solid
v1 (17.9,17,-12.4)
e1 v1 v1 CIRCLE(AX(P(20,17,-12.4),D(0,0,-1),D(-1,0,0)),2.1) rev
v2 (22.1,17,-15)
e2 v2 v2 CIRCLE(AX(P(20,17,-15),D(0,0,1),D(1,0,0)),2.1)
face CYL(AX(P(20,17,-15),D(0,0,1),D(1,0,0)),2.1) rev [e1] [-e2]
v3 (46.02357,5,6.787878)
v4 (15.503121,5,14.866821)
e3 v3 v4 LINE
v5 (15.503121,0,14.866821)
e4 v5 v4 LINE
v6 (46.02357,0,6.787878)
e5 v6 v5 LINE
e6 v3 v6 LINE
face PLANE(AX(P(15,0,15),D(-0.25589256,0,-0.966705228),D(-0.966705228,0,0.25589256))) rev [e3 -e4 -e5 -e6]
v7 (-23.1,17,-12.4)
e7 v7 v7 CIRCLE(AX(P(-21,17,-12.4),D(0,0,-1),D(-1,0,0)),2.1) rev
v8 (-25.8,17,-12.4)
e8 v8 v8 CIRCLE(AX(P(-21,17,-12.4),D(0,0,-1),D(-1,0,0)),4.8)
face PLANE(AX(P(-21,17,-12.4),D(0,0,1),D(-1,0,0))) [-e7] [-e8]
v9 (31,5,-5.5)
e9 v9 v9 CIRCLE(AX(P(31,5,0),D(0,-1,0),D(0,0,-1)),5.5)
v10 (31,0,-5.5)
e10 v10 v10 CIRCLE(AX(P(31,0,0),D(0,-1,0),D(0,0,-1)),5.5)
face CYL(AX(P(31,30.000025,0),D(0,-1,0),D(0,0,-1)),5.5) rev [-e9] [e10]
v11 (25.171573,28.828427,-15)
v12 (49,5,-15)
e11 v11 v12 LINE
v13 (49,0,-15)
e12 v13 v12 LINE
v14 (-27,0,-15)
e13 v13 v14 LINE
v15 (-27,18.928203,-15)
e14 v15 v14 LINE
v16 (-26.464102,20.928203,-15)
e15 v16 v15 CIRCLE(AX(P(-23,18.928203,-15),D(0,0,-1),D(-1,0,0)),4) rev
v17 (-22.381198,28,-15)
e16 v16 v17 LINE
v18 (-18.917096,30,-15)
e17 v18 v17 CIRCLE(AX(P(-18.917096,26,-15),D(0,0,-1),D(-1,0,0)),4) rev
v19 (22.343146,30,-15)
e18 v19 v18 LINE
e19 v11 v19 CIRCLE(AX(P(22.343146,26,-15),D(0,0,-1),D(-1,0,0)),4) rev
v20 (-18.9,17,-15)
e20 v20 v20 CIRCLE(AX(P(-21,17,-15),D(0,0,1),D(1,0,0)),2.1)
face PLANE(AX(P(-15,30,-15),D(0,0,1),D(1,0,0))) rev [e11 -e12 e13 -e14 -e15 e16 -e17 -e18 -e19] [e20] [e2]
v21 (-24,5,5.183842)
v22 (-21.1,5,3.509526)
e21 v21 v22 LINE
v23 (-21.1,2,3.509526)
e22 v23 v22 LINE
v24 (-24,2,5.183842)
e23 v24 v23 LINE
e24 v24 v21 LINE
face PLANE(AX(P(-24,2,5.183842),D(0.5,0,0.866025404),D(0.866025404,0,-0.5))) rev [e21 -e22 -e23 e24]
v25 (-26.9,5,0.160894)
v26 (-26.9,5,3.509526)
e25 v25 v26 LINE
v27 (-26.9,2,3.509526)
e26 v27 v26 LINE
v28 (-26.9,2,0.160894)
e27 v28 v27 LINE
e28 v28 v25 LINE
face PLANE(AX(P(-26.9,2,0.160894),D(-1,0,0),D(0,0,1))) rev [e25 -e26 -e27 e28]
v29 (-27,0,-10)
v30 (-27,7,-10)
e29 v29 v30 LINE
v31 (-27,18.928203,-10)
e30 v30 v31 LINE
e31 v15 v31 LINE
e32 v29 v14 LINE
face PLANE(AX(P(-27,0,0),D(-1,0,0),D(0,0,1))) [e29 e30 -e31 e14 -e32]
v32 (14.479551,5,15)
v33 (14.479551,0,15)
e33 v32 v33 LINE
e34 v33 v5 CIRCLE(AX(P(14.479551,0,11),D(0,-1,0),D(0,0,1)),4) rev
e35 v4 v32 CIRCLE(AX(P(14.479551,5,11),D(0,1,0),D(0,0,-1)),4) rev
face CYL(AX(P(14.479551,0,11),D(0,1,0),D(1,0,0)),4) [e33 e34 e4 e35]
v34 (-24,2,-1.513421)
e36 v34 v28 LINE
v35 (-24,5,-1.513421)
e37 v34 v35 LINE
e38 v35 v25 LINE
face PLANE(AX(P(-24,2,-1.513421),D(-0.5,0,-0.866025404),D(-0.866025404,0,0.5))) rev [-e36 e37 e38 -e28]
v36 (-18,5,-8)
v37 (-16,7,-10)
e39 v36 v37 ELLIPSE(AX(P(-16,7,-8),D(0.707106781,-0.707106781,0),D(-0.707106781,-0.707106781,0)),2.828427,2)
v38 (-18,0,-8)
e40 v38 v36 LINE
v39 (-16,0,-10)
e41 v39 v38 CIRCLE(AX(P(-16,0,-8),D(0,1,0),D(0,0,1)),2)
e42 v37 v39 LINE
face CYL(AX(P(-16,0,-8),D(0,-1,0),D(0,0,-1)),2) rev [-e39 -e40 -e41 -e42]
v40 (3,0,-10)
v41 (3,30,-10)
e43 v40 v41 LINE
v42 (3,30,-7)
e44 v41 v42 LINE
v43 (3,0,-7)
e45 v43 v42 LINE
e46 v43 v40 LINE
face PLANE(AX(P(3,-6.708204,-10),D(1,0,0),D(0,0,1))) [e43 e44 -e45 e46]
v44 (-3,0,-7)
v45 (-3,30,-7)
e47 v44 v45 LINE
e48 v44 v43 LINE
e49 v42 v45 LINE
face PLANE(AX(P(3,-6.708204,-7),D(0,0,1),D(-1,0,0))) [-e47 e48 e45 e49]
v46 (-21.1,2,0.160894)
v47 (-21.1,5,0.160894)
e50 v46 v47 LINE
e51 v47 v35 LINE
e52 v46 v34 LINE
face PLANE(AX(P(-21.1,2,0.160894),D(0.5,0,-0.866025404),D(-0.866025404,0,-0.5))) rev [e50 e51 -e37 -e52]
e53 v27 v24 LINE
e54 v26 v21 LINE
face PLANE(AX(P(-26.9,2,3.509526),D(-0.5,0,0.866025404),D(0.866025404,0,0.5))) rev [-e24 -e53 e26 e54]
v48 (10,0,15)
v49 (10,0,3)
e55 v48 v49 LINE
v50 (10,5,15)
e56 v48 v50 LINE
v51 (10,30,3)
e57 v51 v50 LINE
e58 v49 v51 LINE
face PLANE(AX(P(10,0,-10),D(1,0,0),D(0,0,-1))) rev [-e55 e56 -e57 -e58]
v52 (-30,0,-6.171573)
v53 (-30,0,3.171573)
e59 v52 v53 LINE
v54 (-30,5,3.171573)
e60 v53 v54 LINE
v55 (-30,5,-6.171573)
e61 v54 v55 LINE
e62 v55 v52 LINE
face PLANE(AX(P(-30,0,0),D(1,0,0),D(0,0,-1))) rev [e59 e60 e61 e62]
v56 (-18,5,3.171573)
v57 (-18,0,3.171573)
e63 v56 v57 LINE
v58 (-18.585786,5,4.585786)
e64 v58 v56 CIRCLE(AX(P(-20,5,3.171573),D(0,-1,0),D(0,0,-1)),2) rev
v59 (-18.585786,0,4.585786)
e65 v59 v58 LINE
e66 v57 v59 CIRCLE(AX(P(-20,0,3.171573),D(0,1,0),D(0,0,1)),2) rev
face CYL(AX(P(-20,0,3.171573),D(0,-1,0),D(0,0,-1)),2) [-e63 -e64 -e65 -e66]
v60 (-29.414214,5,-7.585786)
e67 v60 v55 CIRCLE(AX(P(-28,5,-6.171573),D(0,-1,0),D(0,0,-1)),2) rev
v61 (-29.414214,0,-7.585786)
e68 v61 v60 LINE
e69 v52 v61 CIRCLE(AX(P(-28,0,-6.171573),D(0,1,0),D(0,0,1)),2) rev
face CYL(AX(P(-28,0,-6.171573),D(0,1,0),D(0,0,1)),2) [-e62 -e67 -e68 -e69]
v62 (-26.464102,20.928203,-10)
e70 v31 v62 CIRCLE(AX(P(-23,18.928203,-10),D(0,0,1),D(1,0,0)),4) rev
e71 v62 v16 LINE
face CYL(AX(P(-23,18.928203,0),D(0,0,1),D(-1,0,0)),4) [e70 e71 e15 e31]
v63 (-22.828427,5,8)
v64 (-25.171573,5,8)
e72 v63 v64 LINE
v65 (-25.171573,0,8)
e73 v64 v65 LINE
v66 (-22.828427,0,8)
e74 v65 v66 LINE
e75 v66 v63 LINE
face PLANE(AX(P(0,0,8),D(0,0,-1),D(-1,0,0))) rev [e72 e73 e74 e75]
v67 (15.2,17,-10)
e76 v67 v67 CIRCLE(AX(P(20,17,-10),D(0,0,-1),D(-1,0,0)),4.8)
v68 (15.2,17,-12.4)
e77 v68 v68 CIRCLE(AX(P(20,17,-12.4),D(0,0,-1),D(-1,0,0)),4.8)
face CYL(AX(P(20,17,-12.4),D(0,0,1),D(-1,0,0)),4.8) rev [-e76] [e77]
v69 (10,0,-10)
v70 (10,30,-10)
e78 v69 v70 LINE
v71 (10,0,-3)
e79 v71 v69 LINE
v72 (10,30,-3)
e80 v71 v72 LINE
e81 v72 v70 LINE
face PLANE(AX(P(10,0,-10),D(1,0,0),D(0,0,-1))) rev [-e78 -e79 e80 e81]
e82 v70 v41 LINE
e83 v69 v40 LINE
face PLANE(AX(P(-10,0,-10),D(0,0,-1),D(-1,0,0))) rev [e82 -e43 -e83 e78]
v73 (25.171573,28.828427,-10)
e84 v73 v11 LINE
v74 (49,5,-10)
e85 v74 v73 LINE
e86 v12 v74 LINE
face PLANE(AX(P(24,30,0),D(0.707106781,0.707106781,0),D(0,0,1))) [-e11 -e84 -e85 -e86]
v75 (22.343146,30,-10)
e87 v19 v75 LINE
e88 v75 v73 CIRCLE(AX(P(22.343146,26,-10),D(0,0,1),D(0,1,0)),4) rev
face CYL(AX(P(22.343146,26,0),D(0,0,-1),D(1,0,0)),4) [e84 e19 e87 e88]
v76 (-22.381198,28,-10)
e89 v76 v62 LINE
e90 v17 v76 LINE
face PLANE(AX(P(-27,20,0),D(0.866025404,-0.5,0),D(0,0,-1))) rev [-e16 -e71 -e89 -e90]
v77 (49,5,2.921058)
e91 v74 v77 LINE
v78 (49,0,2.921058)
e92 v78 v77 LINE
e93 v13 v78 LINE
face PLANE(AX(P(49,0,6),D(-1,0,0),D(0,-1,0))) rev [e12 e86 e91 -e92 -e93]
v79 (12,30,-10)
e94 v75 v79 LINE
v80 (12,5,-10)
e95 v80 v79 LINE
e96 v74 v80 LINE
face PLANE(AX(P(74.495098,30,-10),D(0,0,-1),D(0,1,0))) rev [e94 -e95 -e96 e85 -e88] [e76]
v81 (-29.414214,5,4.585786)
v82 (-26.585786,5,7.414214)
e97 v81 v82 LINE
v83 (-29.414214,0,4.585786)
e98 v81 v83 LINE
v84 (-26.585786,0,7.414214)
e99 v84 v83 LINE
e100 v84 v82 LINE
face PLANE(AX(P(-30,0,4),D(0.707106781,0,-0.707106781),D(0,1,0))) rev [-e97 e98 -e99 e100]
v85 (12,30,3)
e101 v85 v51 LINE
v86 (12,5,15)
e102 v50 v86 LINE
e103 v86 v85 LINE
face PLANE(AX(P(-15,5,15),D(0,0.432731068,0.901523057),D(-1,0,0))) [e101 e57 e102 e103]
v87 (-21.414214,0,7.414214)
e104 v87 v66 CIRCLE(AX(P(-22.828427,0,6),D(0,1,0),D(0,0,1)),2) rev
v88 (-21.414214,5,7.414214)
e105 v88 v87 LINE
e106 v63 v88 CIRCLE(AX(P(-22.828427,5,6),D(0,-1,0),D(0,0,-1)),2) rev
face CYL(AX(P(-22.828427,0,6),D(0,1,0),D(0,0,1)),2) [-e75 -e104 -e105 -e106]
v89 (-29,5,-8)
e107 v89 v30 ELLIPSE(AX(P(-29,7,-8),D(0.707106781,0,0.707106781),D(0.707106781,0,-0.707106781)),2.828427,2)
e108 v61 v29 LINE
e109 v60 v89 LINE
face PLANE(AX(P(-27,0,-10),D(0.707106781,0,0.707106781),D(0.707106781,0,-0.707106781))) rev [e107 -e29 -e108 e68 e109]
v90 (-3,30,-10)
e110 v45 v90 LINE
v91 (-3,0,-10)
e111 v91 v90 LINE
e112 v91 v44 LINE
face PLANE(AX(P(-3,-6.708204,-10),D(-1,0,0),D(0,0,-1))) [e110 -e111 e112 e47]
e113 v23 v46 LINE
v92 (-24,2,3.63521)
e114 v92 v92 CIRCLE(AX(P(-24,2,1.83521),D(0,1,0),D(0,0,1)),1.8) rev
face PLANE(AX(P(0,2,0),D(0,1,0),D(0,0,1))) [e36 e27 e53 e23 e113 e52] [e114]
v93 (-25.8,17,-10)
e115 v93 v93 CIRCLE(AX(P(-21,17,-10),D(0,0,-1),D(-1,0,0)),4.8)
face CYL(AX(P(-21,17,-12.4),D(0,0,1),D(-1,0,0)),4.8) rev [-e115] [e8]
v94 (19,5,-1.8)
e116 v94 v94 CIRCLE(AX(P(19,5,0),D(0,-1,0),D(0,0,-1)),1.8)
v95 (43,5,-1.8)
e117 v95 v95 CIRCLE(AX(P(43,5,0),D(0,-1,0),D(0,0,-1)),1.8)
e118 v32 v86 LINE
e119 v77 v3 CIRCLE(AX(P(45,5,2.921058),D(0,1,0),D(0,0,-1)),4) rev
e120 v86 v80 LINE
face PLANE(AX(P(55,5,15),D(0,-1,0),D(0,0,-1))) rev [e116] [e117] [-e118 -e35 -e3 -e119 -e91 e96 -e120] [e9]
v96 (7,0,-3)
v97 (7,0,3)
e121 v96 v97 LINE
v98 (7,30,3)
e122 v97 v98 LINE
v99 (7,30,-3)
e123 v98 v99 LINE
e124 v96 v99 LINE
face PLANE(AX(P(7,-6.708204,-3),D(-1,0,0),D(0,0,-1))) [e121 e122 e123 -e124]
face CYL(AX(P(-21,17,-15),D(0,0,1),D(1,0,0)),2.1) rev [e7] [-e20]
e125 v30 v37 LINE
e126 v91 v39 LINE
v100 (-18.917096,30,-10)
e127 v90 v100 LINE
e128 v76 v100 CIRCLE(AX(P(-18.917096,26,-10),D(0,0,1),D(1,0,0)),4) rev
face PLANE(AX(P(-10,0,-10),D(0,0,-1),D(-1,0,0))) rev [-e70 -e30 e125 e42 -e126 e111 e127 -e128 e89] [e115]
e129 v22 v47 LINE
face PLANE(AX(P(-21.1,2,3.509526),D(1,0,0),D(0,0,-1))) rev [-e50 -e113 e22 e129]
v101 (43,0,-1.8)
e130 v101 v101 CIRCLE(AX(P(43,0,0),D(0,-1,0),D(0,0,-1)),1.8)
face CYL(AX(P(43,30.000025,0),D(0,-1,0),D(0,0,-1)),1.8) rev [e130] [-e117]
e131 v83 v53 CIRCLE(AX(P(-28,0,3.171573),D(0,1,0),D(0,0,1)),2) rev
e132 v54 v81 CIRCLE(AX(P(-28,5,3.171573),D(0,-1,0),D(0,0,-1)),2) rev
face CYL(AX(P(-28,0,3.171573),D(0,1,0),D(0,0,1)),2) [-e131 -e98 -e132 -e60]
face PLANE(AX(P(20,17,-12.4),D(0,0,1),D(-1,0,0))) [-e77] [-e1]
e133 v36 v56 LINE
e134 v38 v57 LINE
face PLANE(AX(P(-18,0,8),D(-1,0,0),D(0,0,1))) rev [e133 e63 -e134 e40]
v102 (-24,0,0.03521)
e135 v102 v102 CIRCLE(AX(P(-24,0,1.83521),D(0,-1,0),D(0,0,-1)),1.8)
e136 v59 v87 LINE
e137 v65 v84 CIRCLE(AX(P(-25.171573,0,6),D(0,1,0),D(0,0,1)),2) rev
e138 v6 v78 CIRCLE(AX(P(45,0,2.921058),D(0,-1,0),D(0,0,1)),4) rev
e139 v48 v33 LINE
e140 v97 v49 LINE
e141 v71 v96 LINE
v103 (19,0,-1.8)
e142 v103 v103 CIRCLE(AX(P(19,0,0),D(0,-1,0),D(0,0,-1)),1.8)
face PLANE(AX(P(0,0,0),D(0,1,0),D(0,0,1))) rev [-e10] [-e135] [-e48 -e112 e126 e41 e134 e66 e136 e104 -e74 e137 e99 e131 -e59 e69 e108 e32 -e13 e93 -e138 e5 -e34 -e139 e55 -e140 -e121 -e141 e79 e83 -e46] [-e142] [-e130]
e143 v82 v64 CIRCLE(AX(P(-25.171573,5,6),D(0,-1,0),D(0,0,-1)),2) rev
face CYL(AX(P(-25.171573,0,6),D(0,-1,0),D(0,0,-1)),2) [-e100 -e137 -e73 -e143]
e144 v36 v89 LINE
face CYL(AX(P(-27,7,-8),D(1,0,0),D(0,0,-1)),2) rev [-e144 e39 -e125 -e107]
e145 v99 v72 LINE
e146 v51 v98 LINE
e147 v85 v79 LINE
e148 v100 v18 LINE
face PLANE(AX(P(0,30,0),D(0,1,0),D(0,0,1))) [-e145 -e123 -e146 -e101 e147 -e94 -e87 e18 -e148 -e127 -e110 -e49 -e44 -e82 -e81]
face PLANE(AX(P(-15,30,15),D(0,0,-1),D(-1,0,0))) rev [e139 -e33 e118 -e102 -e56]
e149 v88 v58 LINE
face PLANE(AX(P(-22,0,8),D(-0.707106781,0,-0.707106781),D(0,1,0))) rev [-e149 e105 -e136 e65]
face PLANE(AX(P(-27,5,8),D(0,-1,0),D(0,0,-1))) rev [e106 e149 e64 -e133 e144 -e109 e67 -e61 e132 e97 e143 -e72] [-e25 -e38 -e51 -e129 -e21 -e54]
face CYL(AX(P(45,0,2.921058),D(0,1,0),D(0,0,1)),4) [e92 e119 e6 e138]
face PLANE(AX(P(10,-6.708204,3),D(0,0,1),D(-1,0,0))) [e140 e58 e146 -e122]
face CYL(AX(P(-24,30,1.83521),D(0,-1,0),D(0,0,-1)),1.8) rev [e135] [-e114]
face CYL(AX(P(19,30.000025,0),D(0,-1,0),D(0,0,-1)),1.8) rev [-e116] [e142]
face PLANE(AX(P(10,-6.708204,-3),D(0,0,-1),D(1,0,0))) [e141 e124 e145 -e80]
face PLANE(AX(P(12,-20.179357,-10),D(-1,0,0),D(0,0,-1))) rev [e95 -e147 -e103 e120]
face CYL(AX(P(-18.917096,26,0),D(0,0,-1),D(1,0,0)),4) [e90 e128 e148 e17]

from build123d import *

# Parameters (mm, degrees)
SKETCH1_W                     = 30
SKETCH1_H                     = 30
BOSS_EXTRUDE1_DEPTH           = 30
SKETCH2_W                     = 20
SKETCH2_H                     = 20
CUT_EXTRUDE1_DEPTH            = 37.742346142
SKETCH3_W                     = 30
SKETCH3_H                     = 5
BOSS_EXTRUDE2_DEPTH           = 40
SKETCH4_R                     = 5.5
SKETCH4_R_2                   = 1.8
CUT_EXTRUDE2_DEPTH            = 65.420493634
CUT_EXTRUDE3_DEPTH            = 63.24949799
SKETCH5_W                     = 5
SKETCH5_H                     = 25
BOSS_EXTRUDE4_DEPTH           = 34
CHAMFER1_SIZE                 = 25
SKETCH8_R                     = 2.1
CUT_EXTRUDE4_DEPTH            = 63.657800791
SKETCH9_W                     = 5
SKETCH9_H                     = 30
BOSS_EXTRUDE5_DEPTH           = 12
CHAMFER2_SIZE                 = 10
CHAMFER2_SIZE2                = 5.773502692
SKETCH10_R                    = 2.1
CUT_EXTRUDE5_DEPTH            = 63.657800791
BODY_MOVE_COPY1_OUTLINE_R     = 1.8
BODY_MOVE_COPY1_OUTLINE_R_2   = 5.5
BODY_MOVE_COPY1_DEPTH         = 27.5685
BODY_MOVE_COPY1_2_OUTLINE_R   = 1.8
BODY_MOVE_COPY1_2_OUTLINE_R_2 = 5.5
BODY_MOVE_COPY1_2_DEPTH       = 5
BODY_MOVE_COPY1_START         = -15
BODY_MOVE_COPY1_3_DEPTH       = 5
BODY_MOVE_COPY1_4_DEPTH       = 5
SKETCH11_W                    = 3
SKETCH11_H                    = 25
CUT_EXTRUDE6_DEPTH            = 25
SKETCH12_W                    = 25
SKETCH12_H                    = 25
CUT_EXTRUDE7_DEPTH            = 60.380131357
SKETCH13_W                    = 3
SKETCH13_H                    = 6
SKETCH13_W_2                  = 6
SKETCH13_H_2                  = 3
BOSS_EXTRUDE6_DEPTH           = 30
SKETCH14_R                    = 4.8
CUT_EXTRUDE9_DEPTH            = 2.4
CHAMFER3_SIZE                 = 12
CHAMFER3_SIZE2                = 25
FILLET1_R                     = 4
FILLET2_R                     = 4
BODY_MOVE_COPY2_OUTLINE_R     = 1.8
BODY_MOVE_COPY2_OUTLINE_R_2   = 5.5
BODY_MOVE_COPY2_DEPTH         = 30
BODY_MOVE_COPY2_2_OUTLINE_R   = 1.8
BODY_MOVE_COPY2_2_OUTLINE_R_2 = 5.5
BODY_MOVE_COPY2_2_DEPTH       = 5
BODY_MOVE_COPY2_START         = -15
BODY_MOVE_COPY2_3_DEPTH       = 5
BODY_MOVE_COPY2_START_2       = -3
BODY_MOVE_COPY2_4_OUTLINE_W   = 5
BODY_MOVE_COPY2_4_OUTLINE_H   = 25
BODY_MOVE_COPY2_4_DEPTH       = 6
BODY_MOVE_COPY2_START_3       = -10
BODY_MOVE_COPY2_5_OUTLINE_W   = 2
BODY_MOVE_COPY2_5_OUTLINE_H   = 25
BODY_MOVE_COPY2_5_DEPTH       = 13
BODY_MOVE_COPY2_6_DEPTH       = 2.6
BODY_MOVE_COPY2_START_4       = 10
BODY_MOVE_COPY2_7_DEPTH       = 2
BODY_MOVE_COPY2_START_5       = 7
BODY_MOVE_COPY2_8_OUTLINE_W   = 25
BODY_MOVE_COPY2_8_OUTLINE_H   = 6
BODY_MOVE_COPY2_8_DEPTH       = 3.26576
BODY_MOVE_COPY2_START_6       = -16
BODY_MOVE_COPY2_9_DEPTH       = 6
BODY_MOVE_COPY2_START_7       = -12.4
BODY_MOVE_COPY2_10_DEPTH      = 2.4
SKETCH15_W                    = 13
SKETCH15_H                    = 5
BOSS_EXTRUDE7_DEPTH           = 18
SKETCH17_W                    = 23
SKETCH17_H                    = 5
BOSS_EXTRUDE8_DEPTH           = 3
SKETCH18_W                    = 4
SKETCH18_H                    = 18
CUT_EXTRUDE10_DEPTH           = 58.017541161
CHAMFER6_SIZE                 = 4
FILLET4_R                     = 2
SKETCH16_R                    = 1.8
CUT_EXTRUDE11_DEPTH           = 60.380131357
CUT_EXTRUDE12_DEPTH           = 3


with BuildPart() as part:
    # Sketch1 → Boss-Extrude1 (new body)
    with BuildSketch(Plane(origin=(0, 0, 0), x_dir=(1, 0, 0), z_dir=(0, 1, 0))):
        Rectangle(SKETCH1_W, SKETCH1_H)
    extrude(amount=BOSS_EXTRUDE1_DEPTH)

    # Sketch2 → Cut-Extrude1 (cut, through all)
    with BuildSketch(Plane(origin=(0, 30, 0), x_dir=(1, 0, 0), z_dir=(0, 1, 0))):
        Rectangle(SKETCH2_W, SKETCH2_H)
    extrude(amount=-CUT_EXTRUDE1_DEPTH, mode=Mode.SUBTRACT)

    # Sketch3 → Boss-Extrude2 (add)
    with BuildSketch(Plane(origin=(15, 0, 0), x_dir=(0, 0, -1), z_dir=(1, 0, 0))):
        with Locations((0, 2.5)):
            Rectangle(SKETCH3_W, SKETCH3_H)
    extrude(amount=BOSS_EXTRUDE2_DEPTH)

    # Sketch4 → Cut-Extrude2 (cut, through all)
    with BuildSketch(Plane.XZ):
        with Locations(Location((31, 0, 0), (0, 0, 270))):
            Circle(SKETCH4_R)
        with Locations(Location((19, 0, 0), (0, 0, 270))):
            Circle(SKETCH4_R_2)
        with Locations(Location((43, 0, 0), (0, 0, 270))):
            Circle(SKETCH4_R_2)
    extrude(amount=-CUT_EXTRUDE2_DEPTH, mode=Mode.SUBTRACT)

    # Sketch7 → Cut-Extrude3 (cut, through all)
    with BuildSketch(Plane(origin=(0, 5, 0), x_dir=(1, 0, 0), z_dir=(0, 1, 0))):
        Polygon((15, -15), (49, -6), (49, 15), (55, 15), (55, -15), align=None)
    extrude(amount=-CUT_EXTRUDE3_DEPTH, mode=Mode.SUBTRACT)

    # Sketch5 → Boss-Extrude4 (add)
    with BuildSketch(Plane(origin=(15, 0, 0), x_dir=(0, 0, -1), z_dir=(1, 0, 0))):
        with Locations((12.5, 17.5)):
            Rectangle(SKETCH5_W, SKETCH5_H)
    extrude(amount=BOSS_EXTRUDE4_DEPTH)

    # Chamfer1
    chamfer1_edges = [part.edges().sort_by_distance(p)[0] for p in [
        (49, 30, -12.5),
    ]]
    chamfer(chamfer1_edges, length=CHAMFER1_SIZE)

    # Sketch8 → Cut-Extrude4 (cut, through all)
    with BuildSketch(Plane.XY.offset(-10)):
        with Locations((20, 17)):
            Circle(SKETCH8_R)
    extrude(amount=-CUT_EXTRUDE4_DEPTH, mode=Mode.SUBTRACT)

    # Sketch9 → Boss-Extrude5 (add)
    with BuildSketch(Plane.ZY.offset(15)):
        with Locations((-12.5, 15)):
            Rectangle(SKETCH9_W, SKETCH9_H)
    extrude(amount=BOSS_EXTRUDE5_DEPTH)

    # Chamfer2
    chamfer2_edges = [part.edges().sort_by_distance(p)[0] for p in [
        (-27, 30, -12.5),
    ]]
    chamfer2_side = [part.faces().sort_by_distance(p)[0] for p in [
        (-27, 15, -12.5),
    ]]
    chamfer(chamfer2_edges, length=CHAMFER2_SIZE, length2=CHAMFER2_SIZE2, reference=chamfer2_side[0])

    # Sketch10 → Cut-Extrude5 (cut, through all)
    with BuildSketch(Plane.XY.offset(-10)):
        with Locations((-21, 17)):
            Circle(SKETCH10_R)
    extrude(amount=-CUT_EXTRUDE5_DEPTH, mode=Mode.SUBTRACT)

    # Body-Move/Copy1: read off the stored shape, not the designer's step
    # Body-Move/Copy1 outline → Body-Move/Copy1 (cut)
    with BuildSketch(Plane(origin=(0, 0, 0), x_dir=(1, 0, 0), z_dir=(0, 1, 0))):
        Polygon((27, 10), (15, 10), (15, -15), (49, -6), (49, 15), (27, 15), align=None)
        with Locations((19, 0)):
            Circle(BODY_MOVE_COPY1_OUTLINE_R, mode=Mode.SUBTRACT)
        with Locations((31, 0)):
            Circle(BODY_MOVE_COPY1_OUTLINE_R_2, mode=Mode.SUBTRACT)
        with Locations((43, 0)):
            Circle(BODY_MOVE_COPY1_OUTLINE_R, mode=Mode.SUBTRACT)
    extrude(amount=BODY_MOVE_COPY1_DEPTH, mode=Mode.SUBTRACT)

    # Body-Move_Copy1 2 outline → Body-Move_Copy1 2 (add)
    with BuildSketch(Plane(origin=(0, 0, 0), x_dir=(1, 0, 0), z_dir=(0, 1, 0))):
        Polygon((-27, 10), (-27, 15), (-49, 15), (-49, -6), (-15, -15), (-15, 10), align=None)
        with Locations((-19, 0)):
            Circle(BODY_MOVE_COPY1_2_OUTLINE_R, mode=Mode.SUBTRACT)
        with Locations((-43, 0)):
            Circle(BODY_MOVE_COPY1_2_OUTLINE_R, mode=Mode.SUBTRACT)
        with Locations((-31, 0)):
            Circle(BODY_MOVE_COPY1_2_OUTLINE_R_2, mode=Mode.SUBTRACT)
    extrude(amount=BODY_MOVE_COPY1_2_DEPTH)

    # Body-Move_Copy1 3 outline → Body-Move_Copy1 3 (cut)
    with BuildSketch(Plane.XY.offset(BODY_MOVE_COPY1_START)):
        Polygon((24, 30), (21.226497308, 30), (27, 20), (27, 27), align=None)
        with BuildLine():
            ThreePointArc((-20.5, 14.960392195), (-17.9, 17), (-20.5, 19.039607805))
            ThreePointArc((-20.5, 19.039607805), (-18.9, 17), (-20.5, 14.960392195))
        make_face()
        with BuildLine():
            ThreePointArc((20.5, 14.960392195), (23.1, 17), (20.5, 19.039607805))
            ThreePointArc((20.5, 19.039607805), (22.1, 17), (20.5, 14.960392195))
        make_face()
    extrude(amount=BODY_MOVE_COPY1_3_DEPTH, mode=Mode.SUBTRACT)

    # Body-Move_Copy1 4 outline → Body-Move_Copy1 4 (add)
    with BuildSketch(Plane.XY.offset(BODY_MOVE_COPY1_START)):
        Polygon((-27, 20), (-21.226497308, 30), (-24, 30), (-49, 5), (-27, 5), align=None)
        with BuildLine():
            ThreePointArc((-20.5, 14.960392195), (-22.1, 17), (-20.5, 19.039607805))
            ThreePointArc((-20.5, 19.039607805), (-23.1, 17), (-20.5, 14.960392195))
        make_face()
        with BuildLine():
            ThreePointArc((20.5, 14.960392195), (18.9, 17), (20.5, 19.039607805))
            ThreePointArc((20.5, 19.039607805), (17.9, 17), (20.5, 14.960392195))
        make_face()
    extrude(amount=BODY_MOVE_COPY1_4_DEPTH)

    # Sketch11 → Cut-Extrude6 (cut)
    with BuildSketch(Plane(origin=(0, 30, 0), x_dir=(1, 0, 0), z_dir=(0, 1, 0))):
        with Locations((-13.5, -2.5)):
            Rectangle(SKETCH11_W, SKETCH11_H)
    extrude(amount=-CUT_EXTRUDE6_DEPTH, mode=Mode.SUBTRACT)

    # Sketch12 → Cut-Extrude7 (cut, through all)
    with BuildSketch(Plane(origin=(0, 30, 0), x_dir=(1, 0, 0), z_dir=(0, 1, 0))):
        with Locations((2.5, -2.5)):
            Rectangle(SKETCH12_W, SKETCH12_H)
    extrude(amount=-CUT_EXTRUDE7_DEPTH, mode=Mode.SUBTRACT)

    # Sketch13 → Boss-Extrude6 (add)
    with BuildSketch(Plane(origin=(0, 30, 0), x_dir=(1, 0, 0), z_dir=(0, 1, 0))):
        with Locations((-8.5, 0)):
            Rectangle(SKETCH13_W, SKETCH13_H)
        with Locations((0, 8.5)):
            Rectangle(SKETCH13_W_2, SKETCH13_H_2)
    extrude(amount=-BOSS_EXTRUDE6_DEPTH)

    # Sketch14 → Cut-Extrude9 (cut)
    with BuildSketch(Plane.XY.offset(-10)):
        with Locations((-20, 17)):
            Circle(SKETCH14_R)
        with Locations((21, 17)):
            Circle(SKETCH14_R)
    extrude(amount=-CUT_EXTRUDE9_DEPTH, mode=Mode.SUBTRACT)

    # Chamfer3
    chamfer3_edges = [part.edges().sort_by_distance(p)[0] for p in [
        (-11, 30, 15),
    ]]
    chamfer3_side = [part.faces().sort_by_distance(p)[0] for p in [
        (-18, 30, -10.542718717),
    ]]
    chamfer(chamfer3_edges, length=CHAMFER3_SIZE, length2=CHAMFER3_SIZE2, reference=chamfer3_side[0])

    # Fillet1
    fillet1_edges = [part.edges().sort_by_distance(p)[0] for p in [
        (-15, 2.5, 15),
        (-49, 2.5, 6),
    ]]
    fillet(fillet1_edges, radius=FILLET1_R)

    # Fillet2
    fillet2_edges = [part.edges().sort_by_distance(p)[0] for p in [
        (27, 20, -12.5),
        (21.226497308, 30, -12.5),
        (-24, 30, -12.5),
    ]]
    fillet(fillet2_edges, radius=FILLET2_R)

    # Body-Move/Copy2: read off the stored shape, not the designer's step
    # Body-Move/Copy2 outline → Body-Move/Copy2 (cut)
    with BuildSketch(Plane(origin=(0, 0, 0), x_dir=(1, 0, 0), z_dir=(0, 1, 0))):
        with BuildLine():
            Line((-10, 3), (-10, 10))
            Line((-10, 10), (-27, 10))
            Line((-27, 10), (-27, 15))
            Line((-27, 15), (-49, 15))
            Line((-49, 15), (-49, -2.921057554))
            ThreePointArc((-49, -2.921057554), (-48.169722461, -5.360905811), (-46.023570241, -6.787878466))
            Line((-46.023570241, -6.787878466), (-15.503121001, -14.866820911))
            ThreePointArc((-15.503121001, -14.866820911), (-14.995649759, -14.966565495), (-14.47955076, -15))
            Line((-14.47955076, -15), (-10, -15))
            Line((-10, -15), (-10, -3))
            Line((-10, -3), (-7, -3))
            Line((-7, -3), (-7, 3))
            Line((-7, 3), (-10, 3))
        make_face()
        with Locations((-19, 0)):
            Circle(BODY_MOVE_COPY2_OUTLINE_R, mode=Mode.SUBTRACT)
        with Locations((-43, 0)):
            Circle(BODY_MOVE_COPY2_OUTLINE_R, mode=Mode.SUBTRACT)
        with Locations((-31, 0)):
            Circle(BODY_MOVE_COPY2_OUTLINE_R_2, mode=Mode.SUBTRACT)
    extrude(amount=BODY_MOVE_COPY2_DEPTH, mode=Mode.SUBTRACT)

    # Body-Move_Copy2 2 outline → Body-Move_Copy2 2 (add)
    with BuildSketch(Plane(origin=(0, 0, 0), x_dir=(1, 0, 0), z_dir=(0, 1, 0))):
        with BuildLine():
            Line((49, 15), (27, 15))
            Line((27, 15), (27, 10))
            Line((27, 10), (10, 10))
            Line((10, 10), (10, 3))
            Line((10, 3), (7, 3))
            Line((7, 3), (7, -3))
            Line((7, -3), (10, -3))
            Line((10, -3), (10, -15))
            Line((10, -15), (14.47955076, -15))
            ThreePointArc((14.47955076, -15), (14.995649759, -14.966565495), (15.503121001, -14.866820911))
            Line((15.503121001, -14.866820911), (46.023570241, -6.787878466))
            ThreePointArc((46.023570241, -6.787878466), (48.169722461, -5.360905811), (49, -2.921057554))
            Line((49, -2.921057554), (49, 15))
        make_face()
        with Locations((43, 0)):
            Circle(BODY_MOVE_COPY2_2_OUTLINE_R, mode=Mode.SUBTRACT)
        with Locations((19, 0)):
            Circle(BODY_MOVE_COPY2_2_OUTLINE_R, mode=Mode.SUBTRACT)
        with Locations((31, 0)):
            Circle(BODY_MOVE_COPY2_2_OUTLINE_R_2, mode=Mode.SUBTRACT)
    extrude(amount=BODY_MOVE_COPY2_2_DEPTH)

    # Body-Move_Copy2 3 outline → Body-Move_Copy2 3 (add)
    with BuildSketch(Plane.XY.offset(BODY_MOVE_COPY2_START)):
        with BuildLine():
            Line((27, 5), (49, 5))
            Line((49, 5), (25.171572875, 28.828427125))
            ThreePointArc((25.171572875, 28.828427125), (23.87387948, 29.69551813), (22.343145751, 30))
            Line((22.343145751, 30), (18.917096231, 30))
            ThreePointArc((18.917096231, 30), (20.917096231, 29.464101615), (22.381197846, 28))
            Line((22.381197846, 28), (26.464101615, 20.92820323))
            ThreePointArc((26.464101615, 20.92820323), (26.863703305, 19.96347941), (27, 18.92820323))
            Line((27, 18.92820323), (27, 5))
        make_face()
        with BuildLine():
            ThreePointArc((20.5, 21.773887305), (24.8, 17), (20.5, 12.226112695))
            ThreePointArc((20.5, 12.226112695), (25.8, 17), (20.5, 21.773887305))
        make_face()
        with BuildLine():
            ThreePointArc((-20.5, 21.773887305), (-16.2, 17), (-20.5, 12.226112695))
            ThreePointArc((-20.5, 12.226112695), (-15.2, 17), (-20.5, 21.773887305))
        make_face()
    extrude(amount=BODY_MOVE_COPY2_3_DEPTH)

    # Body-Move_Copy2 4 outline → Body-Move_Copy2 4 (add)
    with BuildSketch(Plane.XY.offset(BODY_MOVE_COPY2_START_2)):
        with Locations((9.5, 17.5)):
            Rectangle(BODY_MOVE_COPY2_4_OUTLINE_W, BODY_MOVE_COPY2_4_OUTLINE_H)
    extrude(amount=BODY_MOVE_COPY2_4_DEPTH)

    # Body-Move_Copy2 5 outline → Body-Move_Copy2 5 (add)
    with BuildSketch(Plane.XY.offset(BODY_MOVE_COPY2_START_3)):
        with Locations((11, 17.5)):
            Rectangle(BODY_MOVE_COPY2_5_OUTLINE_W, BODY_MOVE_COPY2_5_OUTLINE_H)
    extrude(amount=BODY_MOVE_COPY2_5_DEPTH)

    # Body-Move_Copy2 6 outline → Body-Move_Copy2 6 (add)
    with BuildSketch(Plane.XY.offset(BODY_MOVE_COPY2_START)):
        with BuildLine():
            ThreePointArc((-20.5, 19.039607805), (-18.9, 17), (-20.5, 14.960392195))
            ThreePointArc((-20.5, 14.960392195), (-17.9, 17), (-20.5, 19.039607805))
        make_face()
        with BuildLine():
            ThreePointArc((20.5, 19.039607805), (22.1, 17), (20.5, 14.960392195))
            ThreePointArc((20.5, 14.960392195), (23.1, 17), (20.5, 19.039607805))
        make_face()
    extrude(amount=BODY_MOVE_COPY2_6_DEPTH)

    # Body-Move_Copy2 7 outline → Body-Move_Copy2 7 (add)
    with BuildSketch(Plane.YZ.offset(BODY_MOVE_COPY2_START_4)):
        Polygon((5, 15), (5, -10), (30, -10), (30, 3), align=None)
    extrude(amount=BODY_MOVE_COPY2_7_DEPTH)

    # Body-Move_Copy2 8 outline → Body-Move_Copy2 8 (add)
    with BuildSketch(Plane.YZ.offset(BODY_MOVE_COPY2_START_5)):
        with Locations((17.5, 0)):
            Rectangle(BODY_MOVE_COPY2_8_OUTLINE_W, BODY_MOVE_COPY2_8_OUTLINE_H)
    extrude(amount=BODY_MOVE_COPY2_8_DEPTH)

    # Body-Move_Copy2 9 outline → Body-Move_Copy2 9 (cut)
    with BuildSketch(Plane.XY.offset(BODY_MOVE_COPY2_START_6)):
        with BuildLine():
            ThreePointArc((-20.5, 14.960392195), (-22.1, 17), (-20.5, 19.039607805))
            ThreePointArc((-20.5, 19.039607805), (-23.1, 17), (-20.5, 14.960392195))
        make_face()
        with BuildLine():
            ThreePointArc((20.5, 14.960392195), (18.9, 17), (20.5, 19.039607805))
            ThreePointArc((20.5, 19.039607805), (17.9, 17), (20.5, 14.960392195))
        make_face()
        with BuildLine():
            ThreePointArc((-22.381197846, 28), (-20.917096231, 29.464101615), (-18.917096231, 30))
            Line((-18.917096231, 30), (-22.343145751, 30))
            ThreePointArc((-22.343145751, 30), (-23.87387948, 29.69551813), (-25.171572875, 28.828427125))
            Line((-25.171572875, 28.828427125), (-27, 27))
            Line((-27, 27), (-27, 18.92820323))
            ThreePointArc((-27, 18.92820323), (-26.863703305, 19.96347941), (-26.464101615, 20.92820323))
            Line((-26.464101615, 20.92820323), (-22.381197846, 28))
        make_face()
    extrude(amount=BODY_MOVE_COPY2_9_DEPTH, mode=Mode.SUBTRACT)

    # Body-Move_Copy2 10 outline → Body-Move_Copy2 10 (cut)
    with BuildSketch(Plane.XY.offset(BODY_MOVE_COPY2_START_7)):
        with BuildLine():
            ThreePointArc((20.5, 12.226112695), (16.2, 17), (20.5, 21.773887305))
            ThreePointArc((20.5, 21.773887305), (15.2, 17), (20.5, 12.226112695))
        make_face()
        with BuildLine():
            ThreePointArc((-20.5, 12.226112695), (-24.8, 17), (-20.5, 21.773887305))
            ThreePointArc((-20.5, 21.773887305), (-25.8, 17), (-20.5, 12.226112695))
        make_face()
    extrude(amount=BODY_MOVE_COPY2_10_DEPTH, mode=Mode.SUBTRACT)

    # Sketch15 → Boss-Extrude7 (add)
    with BuildSketch(Plane.XY.offset(-10)):
        with Locations((-20.5, 2.5)):
            Rectangle(SKETCH15_W, SKETCH15_H)
    extrude(amount=BOSS_EXTRUDE7_DEPTH)

    # Sketch17 → Boss-Extrude8 (add)
    with BuildSketch(Plane.ZY.offset(27)):
        with Locations((-3.5, 2.5)):
            Rectangle(SKETCH17_W, SKETCH17_H)
    extrude(amount=BOSS_EXTRUDE8_DEPTH)

    # Sketch18 → Cut-Extrude10 (cut, through all)
    with BuildSketch(Plane(origin=(0, 5, 0), x_dir=(1, 0, 0), z_dir=(0, 1, 0))):
        Polygon((-27, 10), (-30, 7), (-30, 15), (-27, 15), align=None)
        with Locations((-16, 1)):
            Rectangle(SKETCH18_W, SKETCH18_H)
    extrude(amount=-CUT_EXTRUDE10_DEPTH, mode=Mode.SUBTRACT)

    # Chamfer6
    chamfer6_edges = [part.edges().sort_by_distance(p)[0] for p in [
        (-30, 2.5, 8),
        (-18, 2.5, 8),
    ]]
    chamfer(chamfer6_edges, length=CHAMFER6_SIZE)

    # Fillet4
    fillet4_edges = [part.edges().sort_by_distance(p)[0] for p in [
        (-30, 2.5, -7),
        (-22.5, 5, -10),
        (-18, 2.5, -10),
        (-26, 2.5, 8),
        (-22, 2.5, 8),
        (-18, 2.5, 4),
        (-30, 2.5, 4),
    ]]
    fillet(fillet4_edges, radius=FILLET4_R)

    # Sketch16 → Cut-Extrude11 (cut, through all)
    with BuildSketch(Plane.XZ):
        with Locations(Location((-24, 1.835210164, 0), (0, 0, 270))):
            Circle(SKETCH16_R)
    extrude(amount=-CUT_EXTRUDE11_DEPTH, mode=Mode.SUBTRACT)

    # Sketch19 → Cut-Extrude12 (cut)
    with BuildSketch(Plane(origin=(0, 5, 0), x_dir=(1, 0, 0), z_dir=(0, 1, 0))):
        Polygon((-21.1, -0.160894384), (-24, 1.513421397), (-26.9, -0.160894384), (-26.9, -3.509525945), (-24, -5.183841726), (-21.1, -3.509525945), align=None)
    extrude(amount=-CUT_EXTRUDE12_DEPTH, mode=Mode.SUBTRACT)


solid = part.part
